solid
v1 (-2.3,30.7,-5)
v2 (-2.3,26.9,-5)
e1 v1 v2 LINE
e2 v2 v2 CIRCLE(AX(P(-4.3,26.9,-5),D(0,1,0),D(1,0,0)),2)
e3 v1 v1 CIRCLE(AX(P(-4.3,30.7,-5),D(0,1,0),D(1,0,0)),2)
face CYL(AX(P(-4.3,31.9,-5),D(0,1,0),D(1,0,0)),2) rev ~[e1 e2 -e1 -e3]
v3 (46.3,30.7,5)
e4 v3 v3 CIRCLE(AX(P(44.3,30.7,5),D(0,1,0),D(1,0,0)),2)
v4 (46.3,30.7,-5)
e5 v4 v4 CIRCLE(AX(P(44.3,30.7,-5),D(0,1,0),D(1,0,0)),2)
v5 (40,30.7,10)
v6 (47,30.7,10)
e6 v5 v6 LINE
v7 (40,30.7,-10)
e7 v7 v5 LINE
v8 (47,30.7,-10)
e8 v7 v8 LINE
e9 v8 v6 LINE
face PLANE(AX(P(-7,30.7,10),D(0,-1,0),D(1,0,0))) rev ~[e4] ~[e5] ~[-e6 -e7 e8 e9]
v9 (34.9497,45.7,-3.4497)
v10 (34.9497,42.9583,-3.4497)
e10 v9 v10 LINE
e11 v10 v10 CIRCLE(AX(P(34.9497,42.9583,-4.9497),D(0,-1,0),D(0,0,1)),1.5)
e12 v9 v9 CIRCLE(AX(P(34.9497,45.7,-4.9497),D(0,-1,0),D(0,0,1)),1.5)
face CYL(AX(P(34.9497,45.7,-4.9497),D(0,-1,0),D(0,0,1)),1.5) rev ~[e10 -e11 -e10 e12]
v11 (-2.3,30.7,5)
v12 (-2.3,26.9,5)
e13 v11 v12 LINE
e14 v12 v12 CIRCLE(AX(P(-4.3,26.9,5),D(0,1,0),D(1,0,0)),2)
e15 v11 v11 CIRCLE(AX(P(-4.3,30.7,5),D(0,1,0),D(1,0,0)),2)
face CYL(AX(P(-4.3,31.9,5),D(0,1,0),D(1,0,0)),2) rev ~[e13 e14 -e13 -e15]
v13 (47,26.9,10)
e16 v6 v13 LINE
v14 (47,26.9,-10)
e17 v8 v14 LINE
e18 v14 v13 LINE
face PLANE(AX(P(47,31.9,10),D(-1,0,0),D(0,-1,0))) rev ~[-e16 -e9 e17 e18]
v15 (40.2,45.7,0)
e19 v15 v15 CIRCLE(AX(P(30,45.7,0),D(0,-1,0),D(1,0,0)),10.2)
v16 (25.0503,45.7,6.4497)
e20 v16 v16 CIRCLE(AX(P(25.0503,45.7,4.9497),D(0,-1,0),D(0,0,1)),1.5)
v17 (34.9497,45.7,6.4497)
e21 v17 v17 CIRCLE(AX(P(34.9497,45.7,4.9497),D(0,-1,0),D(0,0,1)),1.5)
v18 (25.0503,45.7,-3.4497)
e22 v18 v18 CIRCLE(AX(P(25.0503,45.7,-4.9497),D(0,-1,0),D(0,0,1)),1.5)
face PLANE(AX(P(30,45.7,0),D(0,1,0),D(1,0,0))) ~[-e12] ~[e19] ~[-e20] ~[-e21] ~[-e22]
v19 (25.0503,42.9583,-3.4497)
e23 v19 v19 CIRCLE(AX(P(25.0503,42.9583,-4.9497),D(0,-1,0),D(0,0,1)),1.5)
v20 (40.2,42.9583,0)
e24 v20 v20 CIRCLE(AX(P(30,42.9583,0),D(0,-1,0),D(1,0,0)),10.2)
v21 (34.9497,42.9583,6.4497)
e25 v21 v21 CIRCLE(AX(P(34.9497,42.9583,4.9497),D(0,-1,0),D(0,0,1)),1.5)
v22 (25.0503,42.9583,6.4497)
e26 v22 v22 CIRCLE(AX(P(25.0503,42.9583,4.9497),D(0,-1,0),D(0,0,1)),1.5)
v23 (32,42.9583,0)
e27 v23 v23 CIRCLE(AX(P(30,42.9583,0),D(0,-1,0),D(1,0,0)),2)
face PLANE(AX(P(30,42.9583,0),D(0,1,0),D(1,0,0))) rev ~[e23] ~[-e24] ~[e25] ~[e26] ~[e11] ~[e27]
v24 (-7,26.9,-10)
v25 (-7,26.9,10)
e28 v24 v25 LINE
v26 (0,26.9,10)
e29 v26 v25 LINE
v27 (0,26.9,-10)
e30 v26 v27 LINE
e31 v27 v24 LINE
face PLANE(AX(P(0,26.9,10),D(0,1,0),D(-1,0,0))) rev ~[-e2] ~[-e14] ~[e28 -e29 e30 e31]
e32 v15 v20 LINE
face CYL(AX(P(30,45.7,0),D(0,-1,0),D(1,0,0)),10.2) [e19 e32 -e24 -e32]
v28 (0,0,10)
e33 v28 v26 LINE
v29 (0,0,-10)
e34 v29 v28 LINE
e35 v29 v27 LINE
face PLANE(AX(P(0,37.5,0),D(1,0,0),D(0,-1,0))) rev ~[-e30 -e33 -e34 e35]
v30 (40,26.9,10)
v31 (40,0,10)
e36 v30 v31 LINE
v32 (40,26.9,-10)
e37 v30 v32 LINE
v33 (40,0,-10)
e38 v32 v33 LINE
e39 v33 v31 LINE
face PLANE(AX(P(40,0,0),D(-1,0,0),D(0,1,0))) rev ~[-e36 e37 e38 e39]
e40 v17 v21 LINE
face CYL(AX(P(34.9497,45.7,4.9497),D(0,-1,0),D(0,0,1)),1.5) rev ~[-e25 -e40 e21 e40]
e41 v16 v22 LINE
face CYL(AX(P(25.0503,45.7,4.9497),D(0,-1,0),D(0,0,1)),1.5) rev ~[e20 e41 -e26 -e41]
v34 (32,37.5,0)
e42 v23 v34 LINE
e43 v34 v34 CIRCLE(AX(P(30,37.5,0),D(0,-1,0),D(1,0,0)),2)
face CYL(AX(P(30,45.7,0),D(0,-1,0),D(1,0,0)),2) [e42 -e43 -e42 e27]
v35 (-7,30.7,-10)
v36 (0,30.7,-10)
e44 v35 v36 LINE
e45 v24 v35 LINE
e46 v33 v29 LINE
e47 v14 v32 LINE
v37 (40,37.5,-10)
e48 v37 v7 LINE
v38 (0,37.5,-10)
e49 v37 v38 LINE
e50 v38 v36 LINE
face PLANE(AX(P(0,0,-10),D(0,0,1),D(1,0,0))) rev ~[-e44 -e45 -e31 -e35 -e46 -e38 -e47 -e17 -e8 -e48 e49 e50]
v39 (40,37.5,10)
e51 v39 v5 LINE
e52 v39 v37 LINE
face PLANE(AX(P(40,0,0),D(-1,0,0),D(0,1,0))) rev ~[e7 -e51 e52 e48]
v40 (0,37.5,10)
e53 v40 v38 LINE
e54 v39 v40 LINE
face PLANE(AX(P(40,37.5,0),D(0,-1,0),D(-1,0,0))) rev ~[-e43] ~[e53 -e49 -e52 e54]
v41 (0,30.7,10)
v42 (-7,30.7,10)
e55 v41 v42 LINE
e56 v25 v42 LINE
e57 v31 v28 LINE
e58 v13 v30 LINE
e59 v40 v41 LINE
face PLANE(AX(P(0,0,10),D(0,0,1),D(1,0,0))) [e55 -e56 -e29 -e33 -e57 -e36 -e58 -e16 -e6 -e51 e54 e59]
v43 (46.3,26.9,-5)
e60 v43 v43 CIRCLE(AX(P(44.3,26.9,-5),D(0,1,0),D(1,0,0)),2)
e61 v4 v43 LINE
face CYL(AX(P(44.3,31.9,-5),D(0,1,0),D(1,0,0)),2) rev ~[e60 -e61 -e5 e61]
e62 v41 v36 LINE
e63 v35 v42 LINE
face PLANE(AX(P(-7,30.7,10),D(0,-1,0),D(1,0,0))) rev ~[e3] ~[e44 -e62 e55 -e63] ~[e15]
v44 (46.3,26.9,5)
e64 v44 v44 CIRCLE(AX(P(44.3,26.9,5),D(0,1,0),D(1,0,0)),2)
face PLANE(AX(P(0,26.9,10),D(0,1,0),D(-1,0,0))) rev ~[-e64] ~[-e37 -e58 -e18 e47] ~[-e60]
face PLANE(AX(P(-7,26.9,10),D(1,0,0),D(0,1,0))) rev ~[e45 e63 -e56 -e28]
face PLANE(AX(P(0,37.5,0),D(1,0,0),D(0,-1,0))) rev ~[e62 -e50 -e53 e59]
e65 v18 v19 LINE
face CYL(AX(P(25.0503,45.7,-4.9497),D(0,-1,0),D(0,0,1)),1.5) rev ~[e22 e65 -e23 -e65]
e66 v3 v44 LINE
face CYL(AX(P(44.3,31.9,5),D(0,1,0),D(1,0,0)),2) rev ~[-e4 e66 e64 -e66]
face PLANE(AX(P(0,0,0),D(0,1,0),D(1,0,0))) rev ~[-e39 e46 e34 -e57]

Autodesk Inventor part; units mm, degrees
ref_plane "YZ Plane" through (0, 0, 0) normal (1, 0, 0) x (0, 1, 0)
ref_plane "XZ Plane" through (0, 0, 0) normal (0, 1, 0) x (-1, 0, 0)
ref_plane "XY Plane" through (0, 0, 0) normal (0, 0, 1) x (1, 0, 0)
sketch "草圖1" plane through (0, 0, 0) normal (0, 0, 1) x (1, 0, 0)
  line L0 (0, 0) -> (40, 0)
  line L1 (40, 0) -> (40, 37.5)
  line L2 (40, 37.5) -> (0, 37.5)
  line L3 (0, 37.5) -> (0, 0)
  dimension "d0" = 37.5
  dimension "d1" = 40
extrude "擠出1" add sketch "草圖1" along normal mid plane 20
sketch "草圖2" plane through (0, 0, 10) normal (0, 0, 1) x (1, 0, 0)
  line L0 (-7, 31.9) -> (47, 31.9)
  line L1 (47, 31.9) -> (47, 26.9)
  line L2 (47, 26.9) -> (-7, 26.9)
  line L3 (-7, 26.9) -> (-7, 31.9)
  line L4 (0, 37.5) -> (0, 0) projected
  line L5 (0, 0) -> (40, 0) projected
  dimension "d4" = 54
  dimension "d5" = 7
  dimension "d6" = 26.9
  dimension "d7" = 5
extrude "擠出2" add sketch "草圖2" against normal blind 20
sketch "草圖3" plane through (-7, 31.9, 10) normal (0, 1, 0) x (1, 0, 0)
  line L0 (2.7, 15) -> (51.3, 15)
  line L1 (51.3, 15) -> (51.3, 5)
  line L2 (51.3, 5) -> (2.7, 5)
  line L3 (2.7, 5) -> (2.7, 15)
  line L4 (47, 20) -> (54, 20) projected
  line L5 (54, 0) -> (54, 20) projected
  circle A0 centre (2.7, 15) radius 2
  circle A1 centre (2.7, 5) radius 2
  circle A2 centre (51.3, 5) radius 2
  circle A3 centre (51.3, 15) radius 2
  point P0 (7, 10)
  dimension "d10" = 10
  dimension "d11" = 5
  dimension "d12" = 2.7
  dimension "d13" = 48.6
  dimension "d14" = 4
extrude "擠出3" cut sketch "草圖3" against normal blind 20 contours L3 A0 L0 | L0 A0 L3 | A3 L1 L0 | L0 L1 A3 | A1 L2 L3 | L3 L2 A1 | A2 L2 L1 | L1 L2 A2
sketch "草圖4" plane through (0, 0, 0) normal (0, 0, 1) x (1, 0, 0)
  line L0 (0, 37.5) -> (40, 37.5) projected
  line L1 (32, 37.5) -> (30, 37.5)
  line L2 (30, 37.5) -> (30, 45.7)
  line L3 (30, 45.7) -> (32, 45.7)
  line L4 (32, 45.7) -> (32, 37.5)
  line L5 (-2.3, 26.9) -> (-6.3, 26.9) projected
  line L6 (-6.3, 31.9) -> (-2.3, 31.9) projected
  line L7 (-4.3, 26.9) -> (-4.3, 31.9)
  line L8 (40, 0) -> (0, 0) projected
  line L9 (30, 45.7) -> (40.2, 45.7)
  line L10 (40.2, 45.7) -> (40.2, 42.9583)
  line L11 (40.2, 42.9583) -> (30, 42.9583)
  line L12 (30, 42.9583) -> (30, 45.7)
  dimension "d17" = 34.3
  dimension "d18" = 45.7
  dimension "d19" = 2
  dimension "d20" = 10.2
revolve "迴轉1" add sketch "草圖4" angle 360 about axis through (30, 37.5, 0) along (0, 1, 0)
sketch "草圖5" plane through (30, 45.7, 0) normal (0, 1, 0) x (1, 0, 0)
  line L0 (-4.9497, -4.9497) -> (4.9497, -4.9497)
  line L1 (4.9497, -4.9497) -> (4.9497, 4.9497)
  line L2 (4.9497, 4.9497) -> (-4.9497, 4.9497)
  line L3 (-4.9497, 4.9497) -> (-4.9497, -4.9497)
  line L4 (-4.9497, -4.9497) -> (4.9497, 4.9497) construction
  line L5 (4.9497, -4.9497) -> (-4.9497, 4.9497) construction
  circle A0 centre (0, 0) radius 10.2 projected
  point P0 (-30, 0)
  point P1 (0, 0)
  dimension "d22" = 14
hole "孔1" at (34.9497, 45.7, -4.9497) at (34.9497, 45.7, 4.9497) at (25.0503, 45.7, 4.9497) at (25.0503, 45.7, -4.9497) direction (0, -1, 0) diameter 3 depth 4 tip angle 118
move faces "移動1" translate (0, -1.2, 0) faces at (-0.786, 31.9, -1.5071)
move faces "移動2" translate (0, -1.2, 0) faces at (40.786, 31.9, 1.5071)
properties part number "MG996 伺服馬達"
